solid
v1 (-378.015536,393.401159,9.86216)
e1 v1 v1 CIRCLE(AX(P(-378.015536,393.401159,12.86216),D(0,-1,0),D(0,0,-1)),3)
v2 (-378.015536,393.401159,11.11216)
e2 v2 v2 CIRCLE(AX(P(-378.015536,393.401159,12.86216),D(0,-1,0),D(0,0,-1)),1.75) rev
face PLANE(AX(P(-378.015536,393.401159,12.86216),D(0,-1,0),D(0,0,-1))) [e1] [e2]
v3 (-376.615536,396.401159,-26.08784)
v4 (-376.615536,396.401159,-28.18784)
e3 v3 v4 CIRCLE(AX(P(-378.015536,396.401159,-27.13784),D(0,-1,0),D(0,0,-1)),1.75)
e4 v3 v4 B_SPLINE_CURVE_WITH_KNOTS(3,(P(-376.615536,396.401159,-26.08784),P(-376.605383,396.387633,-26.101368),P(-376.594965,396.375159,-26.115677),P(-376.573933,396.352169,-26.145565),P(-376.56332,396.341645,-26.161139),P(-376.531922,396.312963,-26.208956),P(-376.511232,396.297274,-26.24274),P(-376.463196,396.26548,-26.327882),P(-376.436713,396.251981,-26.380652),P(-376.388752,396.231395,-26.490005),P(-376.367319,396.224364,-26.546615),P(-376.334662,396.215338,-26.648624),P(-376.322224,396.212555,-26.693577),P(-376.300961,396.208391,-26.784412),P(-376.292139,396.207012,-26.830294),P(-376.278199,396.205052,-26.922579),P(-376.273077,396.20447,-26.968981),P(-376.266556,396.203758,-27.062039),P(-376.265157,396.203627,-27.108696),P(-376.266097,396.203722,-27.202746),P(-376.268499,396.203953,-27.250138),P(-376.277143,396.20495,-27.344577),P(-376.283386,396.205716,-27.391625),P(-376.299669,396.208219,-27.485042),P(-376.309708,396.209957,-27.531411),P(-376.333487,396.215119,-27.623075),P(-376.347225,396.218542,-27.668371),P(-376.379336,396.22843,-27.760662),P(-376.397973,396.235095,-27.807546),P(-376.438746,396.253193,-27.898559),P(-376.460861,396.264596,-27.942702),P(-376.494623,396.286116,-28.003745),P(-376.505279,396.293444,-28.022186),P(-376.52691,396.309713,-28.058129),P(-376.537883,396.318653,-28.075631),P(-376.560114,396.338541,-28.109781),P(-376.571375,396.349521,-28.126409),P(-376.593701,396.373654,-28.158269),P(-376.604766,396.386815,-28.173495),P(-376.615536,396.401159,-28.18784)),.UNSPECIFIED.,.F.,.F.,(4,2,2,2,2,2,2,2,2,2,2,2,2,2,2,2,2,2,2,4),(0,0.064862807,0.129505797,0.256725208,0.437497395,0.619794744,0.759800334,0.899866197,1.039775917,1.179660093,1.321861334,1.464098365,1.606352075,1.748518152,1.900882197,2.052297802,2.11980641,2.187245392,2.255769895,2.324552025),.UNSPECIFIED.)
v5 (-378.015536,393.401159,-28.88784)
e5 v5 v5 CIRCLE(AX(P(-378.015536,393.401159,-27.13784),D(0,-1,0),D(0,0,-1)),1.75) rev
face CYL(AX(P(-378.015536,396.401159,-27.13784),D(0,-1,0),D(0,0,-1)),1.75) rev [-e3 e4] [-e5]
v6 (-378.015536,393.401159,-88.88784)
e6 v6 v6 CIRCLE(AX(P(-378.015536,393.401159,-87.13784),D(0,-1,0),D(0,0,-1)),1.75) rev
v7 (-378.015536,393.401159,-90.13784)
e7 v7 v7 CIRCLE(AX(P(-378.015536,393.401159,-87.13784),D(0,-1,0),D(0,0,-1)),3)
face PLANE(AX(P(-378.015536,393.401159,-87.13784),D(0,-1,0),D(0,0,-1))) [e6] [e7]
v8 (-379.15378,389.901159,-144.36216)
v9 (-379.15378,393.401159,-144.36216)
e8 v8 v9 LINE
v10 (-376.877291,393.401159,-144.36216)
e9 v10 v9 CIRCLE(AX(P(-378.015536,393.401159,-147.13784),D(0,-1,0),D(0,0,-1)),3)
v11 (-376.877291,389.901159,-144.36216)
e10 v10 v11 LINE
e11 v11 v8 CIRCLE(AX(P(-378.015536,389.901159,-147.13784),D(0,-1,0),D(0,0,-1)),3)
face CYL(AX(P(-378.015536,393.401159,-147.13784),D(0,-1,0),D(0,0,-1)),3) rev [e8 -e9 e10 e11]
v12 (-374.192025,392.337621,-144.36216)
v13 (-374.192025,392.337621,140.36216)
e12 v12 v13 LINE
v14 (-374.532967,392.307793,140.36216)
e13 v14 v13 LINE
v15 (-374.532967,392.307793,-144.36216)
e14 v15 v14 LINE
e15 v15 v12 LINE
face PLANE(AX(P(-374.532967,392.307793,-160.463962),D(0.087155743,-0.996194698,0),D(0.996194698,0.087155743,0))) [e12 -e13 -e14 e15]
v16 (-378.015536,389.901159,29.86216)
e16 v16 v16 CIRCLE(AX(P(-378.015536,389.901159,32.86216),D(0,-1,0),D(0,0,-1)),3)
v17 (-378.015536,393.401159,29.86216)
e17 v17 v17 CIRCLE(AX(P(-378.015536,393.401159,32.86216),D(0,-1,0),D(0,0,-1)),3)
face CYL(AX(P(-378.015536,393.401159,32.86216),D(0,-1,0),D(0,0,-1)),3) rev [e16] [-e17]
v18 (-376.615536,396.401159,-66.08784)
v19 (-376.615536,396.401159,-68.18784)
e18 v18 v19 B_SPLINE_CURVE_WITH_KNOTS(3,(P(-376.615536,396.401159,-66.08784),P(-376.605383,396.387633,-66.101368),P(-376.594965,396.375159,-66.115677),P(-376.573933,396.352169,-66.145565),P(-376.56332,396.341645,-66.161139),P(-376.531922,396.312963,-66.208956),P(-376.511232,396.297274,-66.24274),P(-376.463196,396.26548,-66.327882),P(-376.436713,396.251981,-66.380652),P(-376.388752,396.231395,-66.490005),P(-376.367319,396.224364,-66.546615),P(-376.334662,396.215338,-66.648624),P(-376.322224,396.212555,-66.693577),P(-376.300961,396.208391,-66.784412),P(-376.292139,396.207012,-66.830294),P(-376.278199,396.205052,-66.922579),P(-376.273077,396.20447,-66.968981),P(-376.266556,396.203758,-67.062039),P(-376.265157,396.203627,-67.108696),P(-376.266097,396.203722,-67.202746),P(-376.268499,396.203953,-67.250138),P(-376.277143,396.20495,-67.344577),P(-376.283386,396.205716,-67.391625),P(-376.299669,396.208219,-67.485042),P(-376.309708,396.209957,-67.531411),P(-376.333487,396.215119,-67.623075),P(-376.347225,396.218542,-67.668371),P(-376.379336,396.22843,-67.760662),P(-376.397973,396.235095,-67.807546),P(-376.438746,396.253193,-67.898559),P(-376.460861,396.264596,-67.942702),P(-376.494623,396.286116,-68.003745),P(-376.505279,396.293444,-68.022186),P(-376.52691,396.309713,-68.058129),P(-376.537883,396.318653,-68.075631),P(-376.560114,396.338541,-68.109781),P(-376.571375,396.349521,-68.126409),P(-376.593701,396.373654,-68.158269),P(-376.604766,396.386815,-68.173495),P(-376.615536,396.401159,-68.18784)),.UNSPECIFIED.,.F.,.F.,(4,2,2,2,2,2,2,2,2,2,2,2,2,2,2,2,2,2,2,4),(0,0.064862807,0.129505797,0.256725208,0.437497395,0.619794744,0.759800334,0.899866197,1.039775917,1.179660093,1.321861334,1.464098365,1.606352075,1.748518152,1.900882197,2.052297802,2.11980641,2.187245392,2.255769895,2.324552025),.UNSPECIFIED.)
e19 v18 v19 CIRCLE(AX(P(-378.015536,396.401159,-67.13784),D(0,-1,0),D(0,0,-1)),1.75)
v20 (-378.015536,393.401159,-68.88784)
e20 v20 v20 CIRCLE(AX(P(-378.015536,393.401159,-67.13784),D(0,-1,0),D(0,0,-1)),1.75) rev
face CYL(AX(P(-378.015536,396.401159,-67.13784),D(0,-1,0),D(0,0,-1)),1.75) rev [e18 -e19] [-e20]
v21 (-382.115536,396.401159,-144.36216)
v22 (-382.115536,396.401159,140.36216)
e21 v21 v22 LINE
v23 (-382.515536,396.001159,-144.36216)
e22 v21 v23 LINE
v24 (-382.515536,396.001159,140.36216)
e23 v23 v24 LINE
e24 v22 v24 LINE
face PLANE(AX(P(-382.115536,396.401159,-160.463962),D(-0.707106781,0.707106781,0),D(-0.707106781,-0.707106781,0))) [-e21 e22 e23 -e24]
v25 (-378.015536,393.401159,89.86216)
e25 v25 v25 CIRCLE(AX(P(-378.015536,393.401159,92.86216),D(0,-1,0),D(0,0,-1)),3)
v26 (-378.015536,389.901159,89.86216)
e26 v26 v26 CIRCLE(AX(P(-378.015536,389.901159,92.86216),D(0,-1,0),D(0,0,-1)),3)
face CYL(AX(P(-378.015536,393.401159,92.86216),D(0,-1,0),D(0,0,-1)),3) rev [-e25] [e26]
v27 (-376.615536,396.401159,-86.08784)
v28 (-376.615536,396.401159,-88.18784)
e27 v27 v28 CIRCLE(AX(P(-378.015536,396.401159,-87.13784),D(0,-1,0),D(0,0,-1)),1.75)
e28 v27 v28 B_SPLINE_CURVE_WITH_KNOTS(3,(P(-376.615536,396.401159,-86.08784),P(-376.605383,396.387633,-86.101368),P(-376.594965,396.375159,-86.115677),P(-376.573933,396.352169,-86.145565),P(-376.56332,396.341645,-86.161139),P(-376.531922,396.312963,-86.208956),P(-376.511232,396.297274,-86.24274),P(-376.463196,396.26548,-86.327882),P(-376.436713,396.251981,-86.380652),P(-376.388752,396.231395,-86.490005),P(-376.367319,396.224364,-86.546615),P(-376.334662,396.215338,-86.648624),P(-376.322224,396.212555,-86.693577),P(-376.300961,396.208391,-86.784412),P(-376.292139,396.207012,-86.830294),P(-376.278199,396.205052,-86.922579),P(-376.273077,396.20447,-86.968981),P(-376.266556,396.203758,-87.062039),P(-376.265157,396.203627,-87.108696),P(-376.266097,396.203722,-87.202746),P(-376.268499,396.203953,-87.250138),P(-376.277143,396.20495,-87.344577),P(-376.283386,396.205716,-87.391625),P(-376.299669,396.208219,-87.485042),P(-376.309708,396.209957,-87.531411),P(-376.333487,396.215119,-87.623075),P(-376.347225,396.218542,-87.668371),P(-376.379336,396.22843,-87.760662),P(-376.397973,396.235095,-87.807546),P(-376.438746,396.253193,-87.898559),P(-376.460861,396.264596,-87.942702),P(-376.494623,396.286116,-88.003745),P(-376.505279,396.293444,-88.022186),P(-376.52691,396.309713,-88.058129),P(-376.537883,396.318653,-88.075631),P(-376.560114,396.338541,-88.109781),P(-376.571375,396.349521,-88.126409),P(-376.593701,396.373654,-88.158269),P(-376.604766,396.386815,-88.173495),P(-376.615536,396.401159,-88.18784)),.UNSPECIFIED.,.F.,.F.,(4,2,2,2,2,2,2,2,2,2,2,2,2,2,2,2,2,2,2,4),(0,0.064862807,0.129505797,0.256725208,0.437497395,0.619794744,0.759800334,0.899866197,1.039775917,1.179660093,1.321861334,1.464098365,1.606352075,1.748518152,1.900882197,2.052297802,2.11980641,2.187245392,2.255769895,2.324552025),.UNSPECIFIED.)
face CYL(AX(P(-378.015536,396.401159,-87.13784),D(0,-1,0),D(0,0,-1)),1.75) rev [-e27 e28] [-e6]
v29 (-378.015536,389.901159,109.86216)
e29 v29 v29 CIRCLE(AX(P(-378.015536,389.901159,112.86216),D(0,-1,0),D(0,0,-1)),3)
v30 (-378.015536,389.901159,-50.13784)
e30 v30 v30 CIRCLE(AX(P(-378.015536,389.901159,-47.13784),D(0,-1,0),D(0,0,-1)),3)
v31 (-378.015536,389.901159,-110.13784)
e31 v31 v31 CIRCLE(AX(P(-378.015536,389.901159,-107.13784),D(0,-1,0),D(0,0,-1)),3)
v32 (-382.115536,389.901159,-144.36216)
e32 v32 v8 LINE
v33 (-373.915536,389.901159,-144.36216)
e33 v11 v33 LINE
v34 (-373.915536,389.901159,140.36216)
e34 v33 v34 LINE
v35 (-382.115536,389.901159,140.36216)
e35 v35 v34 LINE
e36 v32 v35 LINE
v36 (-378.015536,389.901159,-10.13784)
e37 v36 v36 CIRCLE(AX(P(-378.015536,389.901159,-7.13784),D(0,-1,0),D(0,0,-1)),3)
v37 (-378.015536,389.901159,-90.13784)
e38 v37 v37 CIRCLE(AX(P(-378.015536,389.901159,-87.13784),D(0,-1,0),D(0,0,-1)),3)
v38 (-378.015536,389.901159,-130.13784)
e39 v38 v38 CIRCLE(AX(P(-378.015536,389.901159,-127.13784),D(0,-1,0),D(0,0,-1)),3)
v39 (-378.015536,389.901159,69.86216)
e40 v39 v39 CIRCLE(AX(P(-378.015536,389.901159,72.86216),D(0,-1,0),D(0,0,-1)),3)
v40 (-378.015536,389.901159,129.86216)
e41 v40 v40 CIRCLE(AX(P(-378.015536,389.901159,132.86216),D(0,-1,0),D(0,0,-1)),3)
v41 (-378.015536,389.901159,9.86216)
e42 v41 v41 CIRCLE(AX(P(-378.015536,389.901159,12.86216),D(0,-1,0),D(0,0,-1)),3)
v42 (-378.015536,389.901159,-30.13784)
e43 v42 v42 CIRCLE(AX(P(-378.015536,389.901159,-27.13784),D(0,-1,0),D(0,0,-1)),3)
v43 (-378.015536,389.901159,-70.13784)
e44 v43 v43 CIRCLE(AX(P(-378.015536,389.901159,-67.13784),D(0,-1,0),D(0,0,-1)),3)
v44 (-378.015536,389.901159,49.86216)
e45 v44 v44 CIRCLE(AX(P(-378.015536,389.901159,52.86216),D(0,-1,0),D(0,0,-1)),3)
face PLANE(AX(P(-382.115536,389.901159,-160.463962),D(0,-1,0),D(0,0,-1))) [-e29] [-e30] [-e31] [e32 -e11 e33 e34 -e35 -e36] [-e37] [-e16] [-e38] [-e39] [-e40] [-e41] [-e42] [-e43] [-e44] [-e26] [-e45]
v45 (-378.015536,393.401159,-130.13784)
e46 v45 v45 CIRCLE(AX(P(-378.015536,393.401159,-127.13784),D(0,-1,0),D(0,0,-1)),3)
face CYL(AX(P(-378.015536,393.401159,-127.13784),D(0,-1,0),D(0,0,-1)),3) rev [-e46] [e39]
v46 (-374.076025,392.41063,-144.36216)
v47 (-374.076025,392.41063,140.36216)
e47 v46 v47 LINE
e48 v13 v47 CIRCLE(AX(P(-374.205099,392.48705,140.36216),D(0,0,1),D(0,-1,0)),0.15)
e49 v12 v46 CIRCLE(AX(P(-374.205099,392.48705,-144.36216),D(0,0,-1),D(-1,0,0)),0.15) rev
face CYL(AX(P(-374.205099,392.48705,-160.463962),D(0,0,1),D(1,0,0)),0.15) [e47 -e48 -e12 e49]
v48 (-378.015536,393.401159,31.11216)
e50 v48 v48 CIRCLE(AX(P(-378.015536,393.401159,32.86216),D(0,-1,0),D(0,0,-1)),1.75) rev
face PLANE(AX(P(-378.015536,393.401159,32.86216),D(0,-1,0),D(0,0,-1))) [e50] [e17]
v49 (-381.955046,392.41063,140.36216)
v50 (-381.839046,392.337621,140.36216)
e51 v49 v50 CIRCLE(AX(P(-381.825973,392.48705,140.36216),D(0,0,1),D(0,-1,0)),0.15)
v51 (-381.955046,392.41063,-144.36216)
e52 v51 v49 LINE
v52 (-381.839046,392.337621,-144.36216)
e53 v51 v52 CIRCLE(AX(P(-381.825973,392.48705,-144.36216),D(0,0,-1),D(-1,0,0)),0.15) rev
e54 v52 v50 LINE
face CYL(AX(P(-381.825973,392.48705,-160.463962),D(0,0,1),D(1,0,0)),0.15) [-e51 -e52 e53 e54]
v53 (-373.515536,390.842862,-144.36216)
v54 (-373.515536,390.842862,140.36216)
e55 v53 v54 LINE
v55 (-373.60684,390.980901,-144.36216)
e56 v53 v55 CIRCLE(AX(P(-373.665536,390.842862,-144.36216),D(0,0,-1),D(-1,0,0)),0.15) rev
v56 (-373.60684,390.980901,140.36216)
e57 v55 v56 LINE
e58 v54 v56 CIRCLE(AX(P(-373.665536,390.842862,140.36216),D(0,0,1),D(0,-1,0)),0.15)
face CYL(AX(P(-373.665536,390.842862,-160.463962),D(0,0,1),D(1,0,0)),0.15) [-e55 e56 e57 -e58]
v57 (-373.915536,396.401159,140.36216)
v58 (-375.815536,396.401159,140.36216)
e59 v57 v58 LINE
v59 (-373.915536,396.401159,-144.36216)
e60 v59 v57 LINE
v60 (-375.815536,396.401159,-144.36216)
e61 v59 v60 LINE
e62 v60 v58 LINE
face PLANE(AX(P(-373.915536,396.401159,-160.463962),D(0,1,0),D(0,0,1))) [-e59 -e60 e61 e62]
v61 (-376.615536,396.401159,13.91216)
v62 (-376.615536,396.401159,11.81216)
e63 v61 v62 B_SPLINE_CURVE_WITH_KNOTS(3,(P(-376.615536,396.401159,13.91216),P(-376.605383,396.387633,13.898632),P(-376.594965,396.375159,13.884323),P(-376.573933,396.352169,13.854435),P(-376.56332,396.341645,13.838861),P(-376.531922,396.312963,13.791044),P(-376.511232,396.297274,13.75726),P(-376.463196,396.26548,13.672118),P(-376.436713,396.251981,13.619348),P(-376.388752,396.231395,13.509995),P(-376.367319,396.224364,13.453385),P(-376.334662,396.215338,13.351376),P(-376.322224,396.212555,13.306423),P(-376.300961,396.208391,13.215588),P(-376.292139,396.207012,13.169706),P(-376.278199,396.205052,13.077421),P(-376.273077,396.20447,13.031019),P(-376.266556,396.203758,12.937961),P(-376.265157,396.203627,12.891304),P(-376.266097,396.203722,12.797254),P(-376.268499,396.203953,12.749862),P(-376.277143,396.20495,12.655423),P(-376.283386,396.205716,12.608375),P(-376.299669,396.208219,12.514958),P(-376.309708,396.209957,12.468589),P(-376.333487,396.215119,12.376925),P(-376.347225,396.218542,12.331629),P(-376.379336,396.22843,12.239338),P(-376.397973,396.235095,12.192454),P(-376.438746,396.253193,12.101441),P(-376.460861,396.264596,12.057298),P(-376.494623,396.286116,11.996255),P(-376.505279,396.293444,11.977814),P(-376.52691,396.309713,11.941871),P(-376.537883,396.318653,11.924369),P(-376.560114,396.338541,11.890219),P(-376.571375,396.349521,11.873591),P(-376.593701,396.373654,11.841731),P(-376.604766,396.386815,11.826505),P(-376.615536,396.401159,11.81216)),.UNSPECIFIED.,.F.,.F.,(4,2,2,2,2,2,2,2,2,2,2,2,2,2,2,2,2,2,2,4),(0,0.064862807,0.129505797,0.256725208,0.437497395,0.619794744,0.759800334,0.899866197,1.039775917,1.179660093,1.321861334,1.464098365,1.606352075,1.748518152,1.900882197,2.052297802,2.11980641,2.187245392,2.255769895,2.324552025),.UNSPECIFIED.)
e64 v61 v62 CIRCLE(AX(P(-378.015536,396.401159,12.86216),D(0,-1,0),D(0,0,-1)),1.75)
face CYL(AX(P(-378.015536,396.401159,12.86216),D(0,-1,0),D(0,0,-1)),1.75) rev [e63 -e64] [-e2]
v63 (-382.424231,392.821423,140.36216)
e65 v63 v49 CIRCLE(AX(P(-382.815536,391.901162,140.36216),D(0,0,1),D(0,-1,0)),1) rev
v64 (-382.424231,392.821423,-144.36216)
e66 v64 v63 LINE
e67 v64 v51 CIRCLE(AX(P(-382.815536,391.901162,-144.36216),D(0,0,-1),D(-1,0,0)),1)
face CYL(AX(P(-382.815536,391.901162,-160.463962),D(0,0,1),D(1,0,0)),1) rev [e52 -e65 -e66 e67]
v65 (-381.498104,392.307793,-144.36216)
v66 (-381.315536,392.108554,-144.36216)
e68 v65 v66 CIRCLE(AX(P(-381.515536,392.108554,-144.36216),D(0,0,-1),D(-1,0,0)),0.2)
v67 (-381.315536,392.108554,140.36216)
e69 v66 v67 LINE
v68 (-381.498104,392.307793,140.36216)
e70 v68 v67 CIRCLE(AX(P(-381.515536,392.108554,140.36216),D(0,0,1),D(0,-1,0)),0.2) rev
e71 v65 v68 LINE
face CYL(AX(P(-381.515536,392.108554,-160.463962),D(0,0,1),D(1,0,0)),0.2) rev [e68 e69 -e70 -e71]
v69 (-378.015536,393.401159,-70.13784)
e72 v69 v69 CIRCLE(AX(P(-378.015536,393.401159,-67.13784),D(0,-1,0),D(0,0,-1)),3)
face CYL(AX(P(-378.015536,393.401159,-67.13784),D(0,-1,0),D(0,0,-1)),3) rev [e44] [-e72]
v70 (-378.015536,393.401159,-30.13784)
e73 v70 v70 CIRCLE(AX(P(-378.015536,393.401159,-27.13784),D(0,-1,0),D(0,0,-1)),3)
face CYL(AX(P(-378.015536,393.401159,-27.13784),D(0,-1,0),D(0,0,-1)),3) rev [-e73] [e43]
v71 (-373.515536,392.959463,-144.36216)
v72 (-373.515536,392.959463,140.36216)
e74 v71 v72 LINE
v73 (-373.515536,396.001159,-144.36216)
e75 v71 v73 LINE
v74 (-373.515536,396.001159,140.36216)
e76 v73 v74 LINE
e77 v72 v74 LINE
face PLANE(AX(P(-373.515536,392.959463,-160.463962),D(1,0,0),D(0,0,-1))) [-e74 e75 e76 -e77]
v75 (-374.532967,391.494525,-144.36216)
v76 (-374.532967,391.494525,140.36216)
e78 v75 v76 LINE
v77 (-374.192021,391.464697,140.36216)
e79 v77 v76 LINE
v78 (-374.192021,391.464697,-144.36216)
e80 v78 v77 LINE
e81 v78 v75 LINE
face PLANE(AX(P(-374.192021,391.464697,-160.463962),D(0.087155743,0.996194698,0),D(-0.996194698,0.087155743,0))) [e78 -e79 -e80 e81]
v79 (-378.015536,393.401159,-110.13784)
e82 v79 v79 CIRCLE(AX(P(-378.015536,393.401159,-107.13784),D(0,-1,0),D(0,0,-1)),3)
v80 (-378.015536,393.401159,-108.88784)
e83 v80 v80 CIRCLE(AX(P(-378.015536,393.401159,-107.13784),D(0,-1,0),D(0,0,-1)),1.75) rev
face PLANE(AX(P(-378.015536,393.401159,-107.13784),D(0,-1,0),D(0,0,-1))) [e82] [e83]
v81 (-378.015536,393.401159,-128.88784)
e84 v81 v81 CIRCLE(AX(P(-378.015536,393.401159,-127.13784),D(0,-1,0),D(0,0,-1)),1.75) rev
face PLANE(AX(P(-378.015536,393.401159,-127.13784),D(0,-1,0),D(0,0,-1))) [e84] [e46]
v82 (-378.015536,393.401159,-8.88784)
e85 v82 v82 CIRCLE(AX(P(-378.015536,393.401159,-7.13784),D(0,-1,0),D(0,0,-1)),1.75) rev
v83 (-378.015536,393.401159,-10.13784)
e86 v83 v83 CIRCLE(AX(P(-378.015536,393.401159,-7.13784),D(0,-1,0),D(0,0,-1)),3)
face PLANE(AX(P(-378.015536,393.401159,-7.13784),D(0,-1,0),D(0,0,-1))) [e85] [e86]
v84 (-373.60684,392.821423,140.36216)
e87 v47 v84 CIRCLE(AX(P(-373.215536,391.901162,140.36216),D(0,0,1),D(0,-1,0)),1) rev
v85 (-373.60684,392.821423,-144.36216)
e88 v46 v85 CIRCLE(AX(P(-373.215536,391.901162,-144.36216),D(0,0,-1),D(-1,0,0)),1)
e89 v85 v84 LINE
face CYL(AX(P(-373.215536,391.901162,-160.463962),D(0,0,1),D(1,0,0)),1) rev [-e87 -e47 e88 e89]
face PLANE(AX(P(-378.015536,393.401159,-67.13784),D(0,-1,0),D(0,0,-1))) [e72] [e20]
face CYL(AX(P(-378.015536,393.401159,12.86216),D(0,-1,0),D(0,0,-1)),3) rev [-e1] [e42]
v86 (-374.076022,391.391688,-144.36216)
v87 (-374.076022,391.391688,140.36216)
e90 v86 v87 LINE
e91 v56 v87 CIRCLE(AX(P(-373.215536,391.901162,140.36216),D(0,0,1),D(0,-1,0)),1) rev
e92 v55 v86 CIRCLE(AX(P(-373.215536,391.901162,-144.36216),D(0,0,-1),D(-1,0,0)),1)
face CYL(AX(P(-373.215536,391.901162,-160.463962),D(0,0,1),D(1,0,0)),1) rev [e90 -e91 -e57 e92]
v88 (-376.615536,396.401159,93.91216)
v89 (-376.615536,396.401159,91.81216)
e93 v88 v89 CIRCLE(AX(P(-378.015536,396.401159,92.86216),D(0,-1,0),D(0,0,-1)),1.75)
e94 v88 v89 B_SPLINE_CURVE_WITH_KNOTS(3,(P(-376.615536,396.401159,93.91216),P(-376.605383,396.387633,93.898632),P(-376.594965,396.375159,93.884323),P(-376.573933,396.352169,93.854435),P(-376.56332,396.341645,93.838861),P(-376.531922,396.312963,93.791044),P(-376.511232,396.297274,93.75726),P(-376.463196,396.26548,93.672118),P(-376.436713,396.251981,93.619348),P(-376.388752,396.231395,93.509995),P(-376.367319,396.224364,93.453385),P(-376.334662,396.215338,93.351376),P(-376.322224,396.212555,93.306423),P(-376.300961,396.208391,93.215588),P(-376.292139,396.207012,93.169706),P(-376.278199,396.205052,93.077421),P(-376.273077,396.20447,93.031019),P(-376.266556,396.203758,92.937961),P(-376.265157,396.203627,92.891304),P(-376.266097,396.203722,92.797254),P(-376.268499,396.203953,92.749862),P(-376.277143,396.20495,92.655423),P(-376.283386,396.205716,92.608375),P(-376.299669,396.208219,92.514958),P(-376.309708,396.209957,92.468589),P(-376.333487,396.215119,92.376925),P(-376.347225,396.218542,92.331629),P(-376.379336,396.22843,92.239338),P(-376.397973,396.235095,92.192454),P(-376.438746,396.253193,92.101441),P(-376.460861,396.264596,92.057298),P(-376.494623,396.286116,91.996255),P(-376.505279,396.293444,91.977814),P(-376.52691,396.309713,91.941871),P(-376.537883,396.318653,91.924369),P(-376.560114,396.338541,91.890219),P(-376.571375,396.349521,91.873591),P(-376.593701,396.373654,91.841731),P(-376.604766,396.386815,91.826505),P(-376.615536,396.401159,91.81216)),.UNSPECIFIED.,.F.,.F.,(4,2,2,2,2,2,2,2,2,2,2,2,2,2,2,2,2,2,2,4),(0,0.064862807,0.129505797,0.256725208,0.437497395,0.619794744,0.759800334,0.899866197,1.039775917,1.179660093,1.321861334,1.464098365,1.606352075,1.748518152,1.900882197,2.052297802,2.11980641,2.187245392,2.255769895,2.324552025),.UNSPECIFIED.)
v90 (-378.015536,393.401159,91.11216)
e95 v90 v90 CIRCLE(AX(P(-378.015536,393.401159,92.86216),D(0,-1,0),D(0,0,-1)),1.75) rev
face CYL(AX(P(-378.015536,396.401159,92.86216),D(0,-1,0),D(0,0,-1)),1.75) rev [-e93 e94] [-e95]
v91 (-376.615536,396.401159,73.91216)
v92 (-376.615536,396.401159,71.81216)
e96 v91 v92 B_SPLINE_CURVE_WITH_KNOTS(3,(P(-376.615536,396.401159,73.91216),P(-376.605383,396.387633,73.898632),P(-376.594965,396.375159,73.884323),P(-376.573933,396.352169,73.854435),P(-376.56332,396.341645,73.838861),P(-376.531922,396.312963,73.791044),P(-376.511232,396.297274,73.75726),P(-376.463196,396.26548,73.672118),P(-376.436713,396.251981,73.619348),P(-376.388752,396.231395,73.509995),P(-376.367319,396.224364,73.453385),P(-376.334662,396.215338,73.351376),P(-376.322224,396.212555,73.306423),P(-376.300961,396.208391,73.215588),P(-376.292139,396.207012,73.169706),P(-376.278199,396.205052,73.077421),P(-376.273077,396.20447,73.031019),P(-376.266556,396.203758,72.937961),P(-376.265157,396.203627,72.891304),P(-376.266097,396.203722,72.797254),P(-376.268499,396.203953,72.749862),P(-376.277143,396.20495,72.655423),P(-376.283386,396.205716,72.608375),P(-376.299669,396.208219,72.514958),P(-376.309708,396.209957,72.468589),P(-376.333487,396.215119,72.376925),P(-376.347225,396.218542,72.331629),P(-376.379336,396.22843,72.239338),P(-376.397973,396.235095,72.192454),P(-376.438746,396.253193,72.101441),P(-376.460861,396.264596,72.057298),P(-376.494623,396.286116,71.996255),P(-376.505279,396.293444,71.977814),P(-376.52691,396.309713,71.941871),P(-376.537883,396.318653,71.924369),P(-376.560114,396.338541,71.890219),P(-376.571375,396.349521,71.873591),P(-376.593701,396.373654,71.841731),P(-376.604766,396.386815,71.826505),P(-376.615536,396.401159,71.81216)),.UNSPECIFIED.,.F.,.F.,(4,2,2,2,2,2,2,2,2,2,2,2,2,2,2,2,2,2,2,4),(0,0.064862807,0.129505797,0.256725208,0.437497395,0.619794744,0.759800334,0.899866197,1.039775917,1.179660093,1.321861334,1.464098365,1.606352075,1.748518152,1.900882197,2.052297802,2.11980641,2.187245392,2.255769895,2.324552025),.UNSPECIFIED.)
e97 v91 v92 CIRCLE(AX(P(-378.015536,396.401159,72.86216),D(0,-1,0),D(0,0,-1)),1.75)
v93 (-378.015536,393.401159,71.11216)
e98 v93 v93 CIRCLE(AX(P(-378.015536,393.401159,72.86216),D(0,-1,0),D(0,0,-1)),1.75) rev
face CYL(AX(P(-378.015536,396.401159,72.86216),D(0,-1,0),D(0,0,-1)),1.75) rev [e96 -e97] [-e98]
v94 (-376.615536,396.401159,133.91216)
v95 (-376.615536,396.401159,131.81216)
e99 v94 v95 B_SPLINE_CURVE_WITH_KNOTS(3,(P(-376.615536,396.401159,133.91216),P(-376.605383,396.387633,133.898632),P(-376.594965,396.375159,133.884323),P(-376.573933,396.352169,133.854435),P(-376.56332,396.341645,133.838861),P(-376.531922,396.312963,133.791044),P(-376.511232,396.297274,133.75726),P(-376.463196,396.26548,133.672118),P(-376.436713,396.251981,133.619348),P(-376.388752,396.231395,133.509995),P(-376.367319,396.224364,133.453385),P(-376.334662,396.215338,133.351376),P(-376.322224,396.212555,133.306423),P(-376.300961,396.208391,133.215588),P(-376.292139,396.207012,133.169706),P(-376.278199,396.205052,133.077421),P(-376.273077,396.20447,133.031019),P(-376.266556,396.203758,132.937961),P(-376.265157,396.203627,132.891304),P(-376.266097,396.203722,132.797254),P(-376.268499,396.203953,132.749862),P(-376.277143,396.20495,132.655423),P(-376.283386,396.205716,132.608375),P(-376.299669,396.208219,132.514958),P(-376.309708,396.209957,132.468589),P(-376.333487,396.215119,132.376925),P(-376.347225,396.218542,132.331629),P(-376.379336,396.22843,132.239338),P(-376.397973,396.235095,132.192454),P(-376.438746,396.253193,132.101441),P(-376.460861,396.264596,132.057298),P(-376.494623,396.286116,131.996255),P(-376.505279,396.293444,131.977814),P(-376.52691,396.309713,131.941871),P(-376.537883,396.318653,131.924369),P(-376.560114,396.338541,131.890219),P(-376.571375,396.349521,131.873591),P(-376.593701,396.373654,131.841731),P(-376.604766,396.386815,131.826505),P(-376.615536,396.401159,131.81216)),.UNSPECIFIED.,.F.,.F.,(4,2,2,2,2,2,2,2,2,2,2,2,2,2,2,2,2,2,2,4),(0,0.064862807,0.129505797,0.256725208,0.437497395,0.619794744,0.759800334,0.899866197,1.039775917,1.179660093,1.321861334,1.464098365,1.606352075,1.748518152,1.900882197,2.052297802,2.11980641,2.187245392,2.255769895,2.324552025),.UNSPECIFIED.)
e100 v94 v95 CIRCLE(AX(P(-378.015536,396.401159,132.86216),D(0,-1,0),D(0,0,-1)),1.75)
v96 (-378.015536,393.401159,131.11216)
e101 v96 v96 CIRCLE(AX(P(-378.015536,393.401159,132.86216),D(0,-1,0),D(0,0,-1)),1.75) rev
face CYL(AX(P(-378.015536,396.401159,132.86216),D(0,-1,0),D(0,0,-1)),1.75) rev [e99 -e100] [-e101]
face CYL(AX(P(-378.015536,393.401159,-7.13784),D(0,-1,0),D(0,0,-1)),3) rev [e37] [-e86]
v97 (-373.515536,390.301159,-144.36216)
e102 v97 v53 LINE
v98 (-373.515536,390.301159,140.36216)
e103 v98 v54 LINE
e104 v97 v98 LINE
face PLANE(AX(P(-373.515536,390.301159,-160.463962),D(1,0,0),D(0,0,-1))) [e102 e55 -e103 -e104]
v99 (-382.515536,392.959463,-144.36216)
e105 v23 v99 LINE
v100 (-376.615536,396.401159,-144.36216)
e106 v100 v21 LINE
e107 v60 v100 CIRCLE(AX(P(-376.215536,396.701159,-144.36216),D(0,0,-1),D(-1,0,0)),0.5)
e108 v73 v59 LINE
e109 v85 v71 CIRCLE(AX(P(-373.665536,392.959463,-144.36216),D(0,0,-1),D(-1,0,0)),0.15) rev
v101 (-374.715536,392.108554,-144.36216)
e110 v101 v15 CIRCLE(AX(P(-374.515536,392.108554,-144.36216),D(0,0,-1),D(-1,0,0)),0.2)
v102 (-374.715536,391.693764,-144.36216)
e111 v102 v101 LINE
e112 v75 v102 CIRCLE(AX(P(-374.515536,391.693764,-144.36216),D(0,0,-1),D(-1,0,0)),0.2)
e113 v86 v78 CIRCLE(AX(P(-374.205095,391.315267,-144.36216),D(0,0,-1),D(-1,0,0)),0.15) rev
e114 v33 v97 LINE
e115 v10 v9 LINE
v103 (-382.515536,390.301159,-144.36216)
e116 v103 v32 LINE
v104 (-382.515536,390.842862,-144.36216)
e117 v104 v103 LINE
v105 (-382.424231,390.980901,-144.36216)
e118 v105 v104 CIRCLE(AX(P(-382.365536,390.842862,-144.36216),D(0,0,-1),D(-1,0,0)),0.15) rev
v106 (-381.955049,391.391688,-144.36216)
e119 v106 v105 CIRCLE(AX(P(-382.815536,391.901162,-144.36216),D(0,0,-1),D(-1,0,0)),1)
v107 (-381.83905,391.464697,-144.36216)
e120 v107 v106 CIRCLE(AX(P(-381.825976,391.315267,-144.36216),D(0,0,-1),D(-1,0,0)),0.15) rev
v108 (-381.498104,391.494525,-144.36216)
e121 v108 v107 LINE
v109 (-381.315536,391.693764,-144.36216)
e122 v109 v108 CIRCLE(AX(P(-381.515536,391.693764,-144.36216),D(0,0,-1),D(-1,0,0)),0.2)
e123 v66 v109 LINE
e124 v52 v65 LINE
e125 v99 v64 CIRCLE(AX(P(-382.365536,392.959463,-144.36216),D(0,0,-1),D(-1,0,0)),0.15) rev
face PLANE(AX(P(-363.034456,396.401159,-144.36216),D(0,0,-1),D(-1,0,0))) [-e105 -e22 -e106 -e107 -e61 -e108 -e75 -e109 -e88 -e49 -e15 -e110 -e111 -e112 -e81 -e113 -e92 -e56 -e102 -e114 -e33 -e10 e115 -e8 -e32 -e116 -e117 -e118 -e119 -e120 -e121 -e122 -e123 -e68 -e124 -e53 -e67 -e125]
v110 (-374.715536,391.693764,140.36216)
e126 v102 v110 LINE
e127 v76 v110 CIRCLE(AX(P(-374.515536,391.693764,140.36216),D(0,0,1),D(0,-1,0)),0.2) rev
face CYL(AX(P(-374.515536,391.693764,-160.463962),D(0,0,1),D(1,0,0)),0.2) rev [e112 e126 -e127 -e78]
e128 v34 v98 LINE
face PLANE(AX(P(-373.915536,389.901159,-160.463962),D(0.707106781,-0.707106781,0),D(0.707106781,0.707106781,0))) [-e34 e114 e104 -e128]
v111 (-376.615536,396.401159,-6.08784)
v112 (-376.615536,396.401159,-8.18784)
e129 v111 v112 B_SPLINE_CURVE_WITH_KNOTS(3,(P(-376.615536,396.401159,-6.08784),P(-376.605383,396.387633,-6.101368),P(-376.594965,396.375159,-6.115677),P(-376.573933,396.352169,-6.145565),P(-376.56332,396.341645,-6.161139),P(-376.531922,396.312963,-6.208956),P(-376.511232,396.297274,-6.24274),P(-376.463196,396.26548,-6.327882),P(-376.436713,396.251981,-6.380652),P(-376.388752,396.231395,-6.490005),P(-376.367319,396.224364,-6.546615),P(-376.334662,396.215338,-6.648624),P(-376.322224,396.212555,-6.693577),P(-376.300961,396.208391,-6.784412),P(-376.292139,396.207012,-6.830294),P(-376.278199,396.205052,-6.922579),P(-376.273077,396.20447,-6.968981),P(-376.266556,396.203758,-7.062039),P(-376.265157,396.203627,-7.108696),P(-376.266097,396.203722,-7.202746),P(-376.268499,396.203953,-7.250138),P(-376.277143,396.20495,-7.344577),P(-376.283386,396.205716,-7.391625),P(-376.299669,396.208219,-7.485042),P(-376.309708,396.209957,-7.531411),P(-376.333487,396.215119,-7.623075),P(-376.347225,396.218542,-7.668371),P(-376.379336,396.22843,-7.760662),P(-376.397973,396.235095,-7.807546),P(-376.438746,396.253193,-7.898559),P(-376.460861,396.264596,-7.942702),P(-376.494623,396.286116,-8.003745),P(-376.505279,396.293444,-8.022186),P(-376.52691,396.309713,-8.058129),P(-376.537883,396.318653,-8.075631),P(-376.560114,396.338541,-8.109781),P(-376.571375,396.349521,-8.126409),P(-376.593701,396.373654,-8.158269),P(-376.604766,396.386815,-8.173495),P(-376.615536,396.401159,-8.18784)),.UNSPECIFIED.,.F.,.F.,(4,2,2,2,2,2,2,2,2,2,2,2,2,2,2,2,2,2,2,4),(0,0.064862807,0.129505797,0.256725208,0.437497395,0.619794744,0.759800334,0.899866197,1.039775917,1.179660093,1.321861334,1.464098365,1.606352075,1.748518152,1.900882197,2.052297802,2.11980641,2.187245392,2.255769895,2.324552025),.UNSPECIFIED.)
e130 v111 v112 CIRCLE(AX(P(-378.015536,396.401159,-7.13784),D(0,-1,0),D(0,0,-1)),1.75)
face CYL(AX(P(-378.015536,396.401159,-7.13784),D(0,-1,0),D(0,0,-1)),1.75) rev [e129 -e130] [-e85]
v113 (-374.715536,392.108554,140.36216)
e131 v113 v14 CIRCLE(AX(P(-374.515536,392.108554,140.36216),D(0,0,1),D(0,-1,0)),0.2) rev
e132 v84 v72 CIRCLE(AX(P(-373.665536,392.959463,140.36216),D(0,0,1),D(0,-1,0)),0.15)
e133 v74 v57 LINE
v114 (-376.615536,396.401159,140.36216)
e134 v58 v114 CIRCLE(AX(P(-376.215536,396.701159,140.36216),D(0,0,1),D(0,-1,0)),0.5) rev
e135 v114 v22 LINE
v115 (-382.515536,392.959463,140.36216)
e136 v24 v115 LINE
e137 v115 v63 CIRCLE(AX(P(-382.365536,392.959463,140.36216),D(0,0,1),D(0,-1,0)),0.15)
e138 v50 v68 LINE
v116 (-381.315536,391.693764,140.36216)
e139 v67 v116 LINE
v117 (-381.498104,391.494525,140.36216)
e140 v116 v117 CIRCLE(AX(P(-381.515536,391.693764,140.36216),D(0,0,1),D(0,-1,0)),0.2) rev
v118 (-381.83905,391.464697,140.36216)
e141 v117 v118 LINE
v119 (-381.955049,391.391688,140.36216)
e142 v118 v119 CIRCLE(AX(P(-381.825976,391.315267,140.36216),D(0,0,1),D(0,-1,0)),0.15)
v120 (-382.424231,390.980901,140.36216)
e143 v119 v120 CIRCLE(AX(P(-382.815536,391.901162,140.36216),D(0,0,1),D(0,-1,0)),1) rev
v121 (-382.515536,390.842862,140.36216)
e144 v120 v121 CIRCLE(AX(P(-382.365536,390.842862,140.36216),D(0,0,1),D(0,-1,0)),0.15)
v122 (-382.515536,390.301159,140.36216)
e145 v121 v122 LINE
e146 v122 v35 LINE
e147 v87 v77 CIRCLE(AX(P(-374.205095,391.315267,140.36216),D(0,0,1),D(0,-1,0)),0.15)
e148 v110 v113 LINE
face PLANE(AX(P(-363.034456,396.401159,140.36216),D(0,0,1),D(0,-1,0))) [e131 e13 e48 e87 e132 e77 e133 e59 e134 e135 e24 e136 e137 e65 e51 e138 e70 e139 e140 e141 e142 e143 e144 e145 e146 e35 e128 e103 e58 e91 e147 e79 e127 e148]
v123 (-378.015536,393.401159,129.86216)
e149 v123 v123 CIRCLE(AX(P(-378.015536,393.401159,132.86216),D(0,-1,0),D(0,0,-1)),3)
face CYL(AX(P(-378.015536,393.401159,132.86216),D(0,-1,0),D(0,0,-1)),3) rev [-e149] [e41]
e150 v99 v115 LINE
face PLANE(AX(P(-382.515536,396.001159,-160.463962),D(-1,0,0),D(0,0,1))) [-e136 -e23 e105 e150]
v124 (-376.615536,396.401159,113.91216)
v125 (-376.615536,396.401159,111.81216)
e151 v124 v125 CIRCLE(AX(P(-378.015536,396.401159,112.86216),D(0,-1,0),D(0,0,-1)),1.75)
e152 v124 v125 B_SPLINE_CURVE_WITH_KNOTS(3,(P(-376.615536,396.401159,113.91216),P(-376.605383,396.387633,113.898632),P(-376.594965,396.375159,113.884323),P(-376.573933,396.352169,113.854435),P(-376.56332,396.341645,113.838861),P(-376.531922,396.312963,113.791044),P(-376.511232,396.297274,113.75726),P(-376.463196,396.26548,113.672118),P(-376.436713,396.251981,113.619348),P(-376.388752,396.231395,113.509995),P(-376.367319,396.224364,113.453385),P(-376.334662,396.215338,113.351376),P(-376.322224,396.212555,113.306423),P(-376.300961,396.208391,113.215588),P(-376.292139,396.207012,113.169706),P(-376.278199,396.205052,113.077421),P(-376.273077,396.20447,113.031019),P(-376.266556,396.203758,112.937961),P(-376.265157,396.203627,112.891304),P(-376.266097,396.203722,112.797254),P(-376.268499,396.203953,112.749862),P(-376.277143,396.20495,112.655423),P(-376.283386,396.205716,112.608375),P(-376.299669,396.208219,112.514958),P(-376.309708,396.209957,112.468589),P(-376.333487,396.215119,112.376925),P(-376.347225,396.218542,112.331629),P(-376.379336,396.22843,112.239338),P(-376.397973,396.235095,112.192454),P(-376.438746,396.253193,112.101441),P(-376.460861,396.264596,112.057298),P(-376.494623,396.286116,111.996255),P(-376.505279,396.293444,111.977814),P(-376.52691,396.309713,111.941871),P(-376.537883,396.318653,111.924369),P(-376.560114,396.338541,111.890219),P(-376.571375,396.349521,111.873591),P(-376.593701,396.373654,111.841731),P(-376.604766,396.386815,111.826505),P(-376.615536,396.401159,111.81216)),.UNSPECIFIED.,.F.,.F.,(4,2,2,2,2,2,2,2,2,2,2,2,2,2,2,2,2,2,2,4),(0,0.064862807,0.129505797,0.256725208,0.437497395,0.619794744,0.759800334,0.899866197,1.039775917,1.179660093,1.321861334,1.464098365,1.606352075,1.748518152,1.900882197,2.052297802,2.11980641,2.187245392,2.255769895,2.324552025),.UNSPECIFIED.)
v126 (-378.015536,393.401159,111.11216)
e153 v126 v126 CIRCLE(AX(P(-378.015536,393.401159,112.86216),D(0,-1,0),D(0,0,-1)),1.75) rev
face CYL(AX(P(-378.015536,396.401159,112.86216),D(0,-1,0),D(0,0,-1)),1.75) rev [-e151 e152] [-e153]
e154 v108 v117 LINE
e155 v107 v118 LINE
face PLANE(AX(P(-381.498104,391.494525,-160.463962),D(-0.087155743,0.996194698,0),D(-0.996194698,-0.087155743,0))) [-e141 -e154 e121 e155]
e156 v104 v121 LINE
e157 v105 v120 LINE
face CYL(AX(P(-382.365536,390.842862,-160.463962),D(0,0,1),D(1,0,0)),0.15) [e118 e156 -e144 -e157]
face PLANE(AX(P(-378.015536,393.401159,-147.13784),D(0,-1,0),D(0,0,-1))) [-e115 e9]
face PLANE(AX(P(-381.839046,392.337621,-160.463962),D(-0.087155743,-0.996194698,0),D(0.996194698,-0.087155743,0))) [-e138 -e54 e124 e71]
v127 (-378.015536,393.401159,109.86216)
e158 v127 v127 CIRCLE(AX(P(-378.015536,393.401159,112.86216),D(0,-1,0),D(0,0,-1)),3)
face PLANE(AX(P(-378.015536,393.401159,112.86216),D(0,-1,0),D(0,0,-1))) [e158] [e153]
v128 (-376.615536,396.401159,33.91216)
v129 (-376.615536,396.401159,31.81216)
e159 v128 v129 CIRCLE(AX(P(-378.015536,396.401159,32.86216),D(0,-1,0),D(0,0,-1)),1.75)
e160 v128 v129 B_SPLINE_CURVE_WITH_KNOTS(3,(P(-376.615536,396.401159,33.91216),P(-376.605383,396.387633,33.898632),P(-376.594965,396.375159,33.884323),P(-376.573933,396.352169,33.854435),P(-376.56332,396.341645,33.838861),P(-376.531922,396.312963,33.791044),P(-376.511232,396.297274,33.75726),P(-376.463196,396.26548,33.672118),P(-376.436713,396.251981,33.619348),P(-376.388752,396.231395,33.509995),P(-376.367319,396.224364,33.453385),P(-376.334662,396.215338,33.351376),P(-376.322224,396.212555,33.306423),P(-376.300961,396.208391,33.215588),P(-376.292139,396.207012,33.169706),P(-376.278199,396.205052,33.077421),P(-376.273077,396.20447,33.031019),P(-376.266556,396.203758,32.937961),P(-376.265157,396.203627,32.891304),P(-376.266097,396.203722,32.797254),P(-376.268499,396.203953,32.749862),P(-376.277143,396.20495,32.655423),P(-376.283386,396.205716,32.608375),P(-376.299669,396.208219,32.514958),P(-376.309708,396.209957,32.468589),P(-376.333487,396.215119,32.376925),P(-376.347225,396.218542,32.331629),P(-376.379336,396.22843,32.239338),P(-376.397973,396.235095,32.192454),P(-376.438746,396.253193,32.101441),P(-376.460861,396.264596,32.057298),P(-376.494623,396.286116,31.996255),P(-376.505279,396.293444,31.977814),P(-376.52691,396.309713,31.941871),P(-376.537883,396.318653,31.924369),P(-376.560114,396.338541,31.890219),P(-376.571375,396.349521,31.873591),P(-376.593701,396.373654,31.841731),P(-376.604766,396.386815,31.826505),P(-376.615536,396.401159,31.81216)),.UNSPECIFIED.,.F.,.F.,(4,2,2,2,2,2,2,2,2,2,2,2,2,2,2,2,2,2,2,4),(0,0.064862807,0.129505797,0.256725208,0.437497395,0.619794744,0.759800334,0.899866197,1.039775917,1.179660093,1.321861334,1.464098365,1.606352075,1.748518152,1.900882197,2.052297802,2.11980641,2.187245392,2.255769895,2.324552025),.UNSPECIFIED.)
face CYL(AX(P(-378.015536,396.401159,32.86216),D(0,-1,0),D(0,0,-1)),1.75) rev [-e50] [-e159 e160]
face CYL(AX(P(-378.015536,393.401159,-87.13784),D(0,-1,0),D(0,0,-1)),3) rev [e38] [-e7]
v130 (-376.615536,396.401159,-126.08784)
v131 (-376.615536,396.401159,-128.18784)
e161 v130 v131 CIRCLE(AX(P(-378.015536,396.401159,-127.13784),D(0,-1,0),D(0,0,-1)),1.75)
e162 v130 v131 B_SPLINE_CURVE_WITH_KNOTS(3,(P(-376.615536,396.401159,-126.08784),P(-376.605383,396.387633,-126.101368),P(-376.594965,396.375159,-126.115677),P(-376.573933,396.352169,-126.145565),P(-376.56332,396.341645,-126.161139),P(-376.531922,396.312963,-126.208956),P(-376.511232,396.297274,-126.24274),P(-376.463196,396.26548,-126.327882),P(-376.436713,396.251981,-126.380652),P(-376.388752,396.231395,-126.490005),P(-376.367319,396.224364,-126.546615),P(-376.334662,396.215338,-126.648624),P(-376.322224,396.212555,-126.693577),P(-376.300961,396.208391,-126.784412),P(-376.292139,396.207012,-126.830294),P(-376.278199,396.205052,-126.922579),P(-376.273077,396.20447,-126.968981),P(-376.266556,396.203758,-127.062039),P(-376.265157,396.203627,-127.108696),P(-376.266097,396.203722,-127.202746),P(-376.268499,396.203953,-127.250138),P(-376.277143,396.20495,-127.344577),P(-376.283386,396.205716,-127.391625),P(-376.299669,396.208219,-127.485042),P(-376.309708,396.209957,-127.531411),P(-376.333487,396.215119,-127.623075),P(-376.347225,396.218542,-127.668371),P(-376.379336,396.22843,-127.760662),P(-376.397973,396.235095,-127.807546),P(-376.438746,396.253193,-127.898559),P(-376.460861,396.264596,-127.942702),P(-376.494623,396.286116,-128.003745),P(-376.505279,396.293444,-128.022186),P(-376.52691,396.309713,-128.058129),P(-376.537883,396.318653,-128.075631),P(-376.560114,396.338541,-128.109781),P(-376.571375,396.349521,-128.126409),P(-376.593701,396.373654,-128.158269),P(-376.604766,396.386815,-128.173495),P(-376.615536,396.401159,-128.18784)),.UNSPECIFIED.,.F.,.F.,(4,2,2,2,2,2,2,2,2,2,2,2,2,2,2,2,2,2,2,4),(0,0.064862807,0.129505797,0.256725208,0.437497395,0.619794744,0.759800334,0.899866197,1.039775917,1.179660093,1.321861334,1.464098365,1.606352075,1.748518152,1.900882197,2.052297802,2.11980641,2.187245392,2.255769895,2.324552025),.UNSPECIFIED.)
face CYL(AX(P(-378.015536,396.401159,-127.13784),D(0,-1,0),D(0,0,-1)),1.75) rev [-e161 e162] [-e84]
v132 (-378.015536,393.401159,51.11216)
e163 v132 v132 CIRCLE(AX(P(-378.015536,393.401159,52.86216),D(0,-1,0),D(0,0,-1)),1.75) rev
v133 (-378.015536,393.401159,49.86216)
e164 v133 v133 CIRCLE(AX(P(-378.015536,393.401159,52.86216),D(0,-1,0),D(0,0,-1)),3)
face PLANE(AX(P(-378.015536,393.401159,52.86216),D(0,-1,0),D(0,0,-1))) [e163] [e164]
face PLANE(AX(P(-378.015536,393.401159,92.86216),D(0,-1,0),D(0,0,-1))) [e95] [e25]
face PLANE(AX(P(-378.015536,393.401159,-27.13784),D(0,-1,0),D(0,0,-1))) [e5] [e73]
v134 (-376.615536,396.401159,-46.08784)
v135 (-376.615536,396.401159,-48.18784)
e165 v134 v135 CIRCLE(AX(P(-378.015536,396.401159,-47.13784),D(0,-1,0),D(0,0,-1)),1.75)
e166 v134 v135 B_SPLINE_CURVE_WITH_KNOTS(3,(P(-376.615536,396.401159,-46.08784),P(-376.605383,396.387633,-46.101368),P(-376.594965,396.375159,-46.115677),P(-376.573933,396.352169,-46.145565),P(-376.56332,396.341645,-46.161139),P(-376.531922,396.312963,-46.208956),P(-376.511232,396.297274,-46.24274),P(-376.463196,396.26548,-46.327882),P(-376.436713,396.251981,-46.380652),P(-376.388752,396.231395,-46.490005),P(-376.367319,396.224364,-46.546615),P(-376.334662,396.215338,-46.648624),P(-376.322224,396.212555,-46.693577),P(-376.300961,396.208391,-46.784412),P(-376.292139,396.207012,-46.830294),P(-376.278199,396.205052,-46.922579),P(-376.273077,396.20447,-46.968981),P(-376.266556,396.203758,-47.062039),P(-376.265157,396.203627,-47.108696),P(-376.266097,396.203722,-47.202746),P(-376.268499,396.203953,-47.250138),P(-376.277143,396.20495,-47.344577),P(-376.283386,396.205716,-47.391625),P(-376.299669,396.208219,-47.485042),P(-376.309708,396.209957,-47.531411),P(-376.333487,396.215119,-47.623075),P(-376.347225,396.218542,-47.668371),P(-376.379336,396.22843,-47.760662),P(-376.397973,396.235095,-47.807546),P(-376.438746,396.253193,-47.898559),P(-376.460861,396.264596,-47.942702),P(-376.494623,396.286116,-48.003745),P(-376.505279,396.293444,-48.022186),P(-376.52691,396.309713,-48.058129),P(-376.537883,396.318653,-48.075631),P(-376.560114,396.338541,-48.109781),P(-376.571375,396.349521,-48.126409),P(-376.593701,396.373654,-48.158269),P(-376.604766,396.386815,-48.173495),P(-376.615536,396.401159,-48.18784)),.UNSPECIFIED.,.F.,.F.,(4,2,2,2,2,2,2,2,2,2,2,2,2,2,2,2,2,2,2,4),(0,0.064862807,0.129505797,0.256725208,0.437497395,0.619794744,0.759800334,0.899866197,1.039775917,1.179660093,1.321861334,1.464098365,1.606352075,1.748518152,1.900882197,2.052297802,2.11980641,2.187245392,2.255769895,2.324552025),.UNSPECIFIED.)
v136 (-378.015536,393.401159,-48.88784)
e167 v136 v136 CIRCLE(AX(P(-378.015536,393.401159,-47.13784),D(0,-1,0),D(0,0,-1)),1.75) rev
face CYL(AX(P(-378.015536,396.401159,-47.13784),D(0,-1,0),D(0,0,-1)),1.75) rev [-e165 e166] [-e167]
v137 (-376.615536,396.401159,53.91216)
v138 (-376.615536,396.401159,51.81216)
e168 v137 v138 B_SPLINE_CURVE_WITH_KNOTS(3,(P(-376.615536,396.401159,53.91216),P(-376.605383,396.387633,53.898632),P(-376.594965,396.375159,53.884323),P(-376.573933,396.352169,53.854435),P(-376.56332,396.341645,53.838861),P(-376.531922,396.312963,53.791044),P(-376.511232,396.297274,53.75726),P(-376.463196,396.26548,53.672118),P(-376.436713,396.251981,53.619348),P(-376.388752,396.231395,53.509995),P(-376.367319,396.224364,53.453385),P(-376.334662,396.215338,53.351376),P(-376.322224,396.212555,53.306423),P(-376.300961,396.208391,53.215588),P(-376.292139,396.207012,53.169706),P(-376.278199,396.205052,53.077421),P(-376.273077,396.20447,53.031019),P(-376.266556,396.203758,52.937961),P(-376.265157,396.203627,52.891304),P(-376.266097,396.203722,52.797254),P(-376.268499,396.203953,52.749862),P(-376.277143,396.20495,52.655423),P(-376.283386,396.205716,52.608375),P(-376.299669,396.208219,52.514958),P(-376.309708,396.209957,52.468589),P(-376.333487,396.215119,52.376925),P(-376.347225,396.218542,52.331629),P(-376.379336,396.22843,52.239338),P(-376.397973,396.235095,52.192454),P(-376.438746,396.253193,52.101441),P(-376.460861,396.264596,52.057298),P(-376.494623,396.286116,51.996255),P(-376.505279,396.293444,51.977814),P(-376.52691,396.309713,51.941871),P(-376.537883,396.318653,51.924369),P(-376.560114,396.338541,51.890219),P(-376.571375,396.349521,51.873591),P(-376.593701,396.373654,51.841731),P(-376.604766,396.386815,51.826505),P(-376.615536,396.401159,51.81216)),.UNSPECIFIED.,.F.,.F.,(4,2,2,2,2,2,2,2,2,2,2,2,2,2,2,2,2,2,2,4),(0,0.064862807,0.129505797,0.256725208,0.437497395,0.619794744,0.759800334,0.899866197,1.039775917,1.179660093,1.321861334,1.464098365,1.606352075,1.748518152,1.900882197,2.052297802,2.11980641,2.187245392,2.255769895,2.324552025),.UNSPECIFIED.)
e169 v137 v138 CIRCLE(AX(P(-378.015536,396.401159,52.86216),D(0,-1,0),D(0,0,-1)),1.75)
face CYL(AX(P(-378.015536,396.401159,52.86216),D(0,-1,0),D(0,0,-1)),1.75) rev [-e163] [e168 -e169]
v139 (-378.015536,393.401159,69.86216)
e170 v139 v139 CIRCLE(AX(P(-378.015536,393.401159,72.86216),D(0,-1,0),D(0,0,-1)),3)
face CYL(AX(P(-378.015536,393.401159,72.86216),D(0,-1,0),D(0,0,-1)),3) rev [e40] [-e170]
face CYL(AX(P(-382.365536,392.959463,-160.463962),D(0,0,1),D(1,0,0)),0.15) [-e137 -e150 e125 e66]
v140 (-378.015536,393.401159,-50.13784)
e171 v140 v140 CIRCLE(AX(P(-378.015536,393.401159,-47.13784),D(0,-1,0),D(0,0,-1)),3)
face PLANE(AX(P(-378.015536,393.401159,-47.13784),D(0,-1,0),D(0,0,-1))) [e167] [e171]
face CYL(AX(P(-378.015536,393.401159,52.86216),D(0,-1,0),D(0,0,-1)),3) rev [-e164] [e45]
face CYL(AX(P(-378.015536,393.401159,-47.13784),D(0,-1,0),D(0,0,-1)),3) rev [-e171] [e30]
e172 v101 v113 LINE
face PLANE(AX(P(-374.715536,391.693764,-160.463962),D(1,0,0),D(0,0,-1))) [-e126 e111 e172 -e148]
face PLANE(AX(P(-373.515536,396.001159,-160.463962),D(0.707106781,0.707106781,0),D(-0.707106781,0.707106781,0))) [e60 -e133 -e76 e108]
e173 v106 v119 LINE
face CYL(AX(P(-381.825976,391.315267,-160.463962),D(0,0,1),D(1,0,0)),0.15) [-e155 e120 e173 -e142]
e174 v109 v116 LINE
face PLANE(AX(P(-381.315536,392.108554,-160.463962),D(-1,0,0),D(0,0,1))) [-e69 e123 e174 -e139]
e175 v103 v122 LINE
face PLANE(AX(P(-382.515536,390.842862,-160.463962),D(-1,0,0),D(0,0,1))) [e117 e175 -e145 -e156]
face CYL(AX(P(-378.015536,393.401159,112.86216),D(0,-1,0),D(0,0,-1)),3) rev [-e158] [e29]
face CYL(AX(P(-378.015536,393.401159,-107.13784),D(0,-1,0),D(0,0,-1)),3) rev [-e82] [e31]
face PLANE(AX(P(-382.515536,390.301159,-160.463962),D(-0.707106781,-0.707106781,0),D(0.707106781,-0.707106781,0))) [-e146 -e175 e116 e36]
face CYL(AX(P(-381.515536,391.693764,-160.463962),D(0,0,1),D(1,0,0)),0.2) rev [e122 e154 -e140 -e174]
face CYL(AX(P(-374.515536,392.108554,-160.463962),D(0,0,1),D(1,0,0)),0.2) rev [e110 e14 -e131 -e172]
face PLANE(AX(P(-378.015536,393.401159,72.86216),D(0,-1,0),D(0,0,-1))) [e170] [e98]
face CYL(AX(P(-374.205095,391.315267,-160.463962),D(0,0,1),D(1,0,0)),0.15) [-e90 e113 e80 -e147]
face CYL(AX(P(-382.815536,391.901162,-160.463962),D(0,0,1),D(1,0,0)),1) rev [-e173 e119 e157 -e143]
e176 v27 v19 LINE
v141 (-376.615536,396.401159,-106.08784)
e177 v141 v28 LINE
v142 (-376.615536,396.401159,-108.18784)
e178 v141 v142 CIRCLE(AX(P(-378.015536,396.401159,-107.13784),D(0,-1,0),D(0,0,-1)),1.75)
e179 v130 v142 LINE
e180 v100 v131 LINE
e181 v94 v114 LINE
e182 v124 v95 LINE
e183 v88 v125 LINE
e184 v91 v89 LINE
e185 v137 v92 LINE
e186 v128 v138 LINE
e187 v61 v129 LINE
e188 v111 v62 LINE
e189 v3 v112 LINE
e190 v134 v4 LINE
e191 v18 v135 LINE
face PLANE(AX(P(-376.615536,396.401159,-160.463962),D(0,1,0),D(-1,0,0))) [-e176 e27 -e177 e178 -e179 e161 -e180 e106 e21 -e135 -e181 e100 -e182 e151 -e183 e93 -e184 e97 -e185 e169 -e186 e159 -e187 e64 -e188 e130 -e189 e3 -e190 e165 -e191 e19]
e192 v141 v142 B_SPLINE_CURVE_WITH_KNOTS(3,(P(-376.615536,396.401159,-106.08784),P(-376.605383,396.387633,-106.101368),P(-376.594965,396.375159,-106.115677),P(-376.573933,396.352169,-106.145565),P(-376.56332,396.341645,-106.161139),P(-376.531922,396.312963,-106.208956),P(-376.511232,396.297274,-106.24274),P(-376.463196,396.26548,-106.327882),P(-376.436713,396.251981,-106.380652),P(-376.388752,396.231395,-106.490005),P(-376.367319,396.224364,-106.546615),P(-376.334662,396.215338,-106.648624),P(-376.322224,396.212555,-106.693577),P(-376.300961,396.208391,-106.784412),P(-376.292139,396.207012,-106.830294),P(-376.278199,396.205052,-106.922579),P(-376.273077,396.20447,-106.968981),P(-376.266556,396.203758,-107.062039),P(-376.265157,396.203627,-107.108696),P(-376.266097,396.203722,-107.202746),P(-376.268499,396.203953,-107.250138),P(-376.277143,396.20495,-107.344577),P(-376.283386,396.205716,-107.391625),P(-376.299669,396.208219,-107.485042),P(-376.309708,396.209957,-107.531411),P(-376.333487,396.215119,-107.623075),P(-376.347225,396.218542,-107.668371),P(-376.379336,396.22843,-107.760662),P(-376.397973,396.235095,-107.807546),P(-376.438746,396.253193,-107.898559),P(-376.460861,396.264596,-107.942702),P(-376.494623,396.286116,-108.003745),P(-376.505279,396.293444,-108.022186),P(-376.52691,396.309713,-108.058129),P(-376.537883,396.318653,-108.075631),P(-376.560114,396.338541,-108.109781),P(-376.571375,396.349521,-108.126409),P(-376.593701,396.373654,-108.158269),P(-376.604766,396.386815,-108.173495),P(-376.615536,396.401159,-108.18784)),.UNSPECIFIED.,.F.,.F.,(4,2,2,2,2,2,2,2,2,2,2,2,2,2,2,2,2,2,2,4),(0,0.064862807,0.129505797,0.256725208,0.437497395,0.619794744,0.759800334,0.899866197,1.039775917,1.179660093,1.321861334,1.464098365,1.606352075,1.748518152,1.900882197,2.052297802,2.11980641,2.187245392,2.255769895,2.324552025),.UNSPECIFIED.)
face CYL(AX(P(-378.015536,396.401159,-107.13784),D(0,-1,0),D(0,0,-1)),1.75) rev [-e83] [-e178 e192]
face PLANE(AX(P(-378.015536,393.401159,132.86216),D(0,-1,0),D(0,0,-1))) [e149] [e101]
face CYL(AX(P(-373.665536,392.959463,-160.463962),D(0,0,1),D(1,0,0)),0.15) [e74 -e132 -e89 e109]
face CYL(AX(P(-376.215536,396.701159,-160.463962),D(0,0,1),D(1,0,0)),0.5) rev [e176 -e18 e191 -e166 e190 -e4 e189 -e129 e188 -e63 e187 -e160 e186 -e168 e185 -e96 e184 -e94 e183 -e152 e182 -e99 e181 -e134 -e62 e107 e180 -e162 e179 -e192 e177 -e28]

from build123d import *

# Parameters (mm, degrees)
BOSS_EXTRUDE1_START = -144.36216
BOSS_EXTRUDE1_DEPTH = 284.72432
SKETCH2_R           = 1.75
CUT_EXTRUDE1_DEPTH  = 409.901966471
SKETCH2_3_R         = 3
CUT_EXTRUDE2_DEPTH  = 3.5


# Read off the part's stored shape, not the designer's step: Boss-Extrude1
with BuildPart() as part:
    # Boss-Extrude1 outline → Boss-Extrude1 (new body)
    with BuildSketch(Plane.XY.offset(BOSS_EXTRUDE1_START)):
        with BuildLine():
            ThreePointArc((-375.815535559, 396.401159064), (-376.215535559, 396.201159064), (-376.615535559, 396.401159064))
            Line((-376.615535559, 396.401159064), (-382.115535559, 396.401159064))
            Line((-382.115535559, 396.401159064), (-382.515535559, 396.001159064))
            Line((-382.515535559, 396.001159064), (-382.515535559, 392.959462588))
            ThreePointArc((-382.515535559, 392.959462588), (-382.490644208, 392.876710995), (-382.424231211, 392.82142339))
            ThreePointArc((-382.424231211, 392.82142339), (-382.156798336, 392.653535157), (-381.955046042, 392.410630209))
            ThreePointArc((-381.955046042, 392.410630209), (-381.905872585, 392.360101643), (-381.839045976, 392.337621226))
            Line((-381.839045976, 392.337621226), (-381.498104411, 392.307792704))
            ThreePointArc((-381.498104411, 392.307792704), (-381.368080092, 392.243671806), (-381.315535559, 392.108553765))
            Line((-381.315535559, 392.108553765), (-381.315535559, 391.693764363))
            ThreePointArc((-381.315535559, 391.693764363), (-381.368080092, 391.558646322), (-381.498104411, 391.494525424))
            Line((-381.498104411, 391.494525424), (-381.839049723, 391.464696574))
            ThreePointArc((-381.839049723, 391.464696574), (-381.905875926, 391.442216412), (-381.9550493, 391.391688416))
            ThreePointArc((-381.9550493, 391.391688416), (-382.156800742, 391.148786865), (-382.424231211, 390.980900738))
            ThreePointArc((-382.424231211, 390.980900738), (-382.490644208, 390.925613133), (-382.515535559, 390.84286154))
            Line((-382.515535559, 390.84286154), (-382.515535559, 390.301159064))
            Line((-382.515535559, 390.301159064), (-382.115535559, 389.901159064))
            Line((-382.115535559, 389.901159064), (-373.915535559, 389.901159064))
            Line((-373.915535559, 389.901159064), (-373.515535559, 390.301159064))
            Line((-373.515535559, 390.301159064), (-373.515535559, 390.84286154))
            ThreePointArc((-373.515535559, 390.84286154), (-373.540426911, 390.925613132), (-373.606839907, 390.980900738))
            ThreePointArc((-373.606839907, 390.980900738), (-373.874270377, 391.148786865), (-374.076021819, 391.391688416))
            ThreePointArc((-374.076021819, 391.391688416), (-374.125195193, 391.442216412), (-374.192021396, 391.464696574))
            Line((-374.192021396, 391.464696574), (-374.532966708, 391.494525424))
            ThreePointArc((-374.532966708, 391.494525424), (-374.662991027, 391.558646322), (-374.715535559, 391.693764363))
            Line((-374.715535559, 391.693764363), (-374.715535559, 392.108553765))
            ThreePointArc((-374.715535559, 392.108553765), (-374.662991027, 392.243671806), (-374.532966708, 392.307792704))
            Line((-374.532966708, 392.307792704), (-374.192025143, 392.337621226))
            ThreePointArc((-374.192025143, 392.337621226), (-374.125198533, 392.360101643), (-374.076025076, 392.410630209))
            ThreePointArc((-374.076025076, 392.410630209), (-373.874272783, 392.653535157), (-373.606839907, 392.82142339))
            ThreePointArc((-373.606839907, 392.82142339), (-373.540426911, 392.876710996), (-373.515535559, 392.959462588))
            Line((-373.515535559, 392.959462588), (-373.515535559, 396.001159064))
            Line((-373.515535559, 396.001159064), (-373.915535559, 396.401159064))
            Line((-373.915535559, 396.401159064), (-375.815535559, 396.401159064))
        make_face()
    extrude(amount=BOSS_EXTRUDE1_DEPTH)

    # Sketch2 → Cut-Extrude1 (cut, through all)
    with BuildSketch(Plane.XZ.offset(-389.901159064)):
        with Locations(Location((-378.015535559, 132.86216, 0), (0, 0, 270))):
            Circle(SKETCH2_R)
        with Locations(Location((-378.015535559, 112.86216, 0), (0, 0, 270))):
            Circle(SKETCH2_R)
        with Locations(Location((-378.015535559, 92.86216, 0), (0, 0, 270))):
            Circle(SKETCH2_R)
        with Locations(Location((-378.015535559, 72.86216, 0), (0, 0, 270))):
            Circle(SKETCH2_R)
        with Locations(Location((-378.015535559, 52.86216, 0), (0, 0, 270))):
            Circle(SKETCH2_R)
        with Locations(Location((-378.015535559, 32.86216, 0), (0, 0, 270))):
            Circle(SKETCH2_R)
        with Locations(Location((-378.015535559, 12.86216, 0), (0, 0, 270))):
            Circle(SKETCH2_R)
        with Locations(Location((-378.015535559, -7.13784, 0), (0, 0, 270))):
            Circle(SKETCH2_R)
        with Locations(Location((-378.015535559, -27.13784, 0), (0, 0, 270))):
            Circle(SKETCH2_R)
        with Locations(Location((-378.015535559, -47.13784, 0), (0, 0, 270))):
            Circle(SKETCH2_R)
        with Locations(Location((-378.015535559, -67.13784, 0), (0, 0, 270))):
            Circle(SKETCH2_R)
        with Locations(Location((-378.015535559, -87.13784, 0), (0, 0, 270))):
            Circle(SKETCH2_R)
        with Locations(Location((-378.015535559, -107.13784, 0), (0, 0, 270))):
            Circle(SKETCH2_R)
        with Locations(Location((-378.015535559, -127.13784, 0), (0, 0, 270))):
            Circle(SKETCH2_R)
        with Locations((-378.015535559, -147.13784)):
            Circle(SKETCH2_R)
        with Locations((-378.015535559, -167.13784)):
            Circle(SKETCH2_R)
        with Locations((-378.015535559, -187.13784)):
            Circle(SKETCH2_R)
        with Locations((-378.015535559, -207.13784)):
            Circle(SKETCH2_R)
        with Locations((-378.015535559, -227.13784)):
            Circle(SKETCH2_R)
        with Locations((-378.015535559, -247.13784)):
            Circle(SKETCH2_R)
        with Locations((-378.015535559, -267.13784)):
            Circle(SKETCH2_R)
        with Locations((-378.015535559, -287.13784)):
            Circle(SKETCH2_R)
        with Locations((-378.015535559, -307.13784)):
            Circle(SKETCH2_R)
    extrude(amount=-CUT_EXTRUDE1_DEPTH, mode=Mode.SUBTRACT)

    # Sketch2<3> → Cut-Extrude2 (cut)
    with BuildSketch(Plane.XZ.offset(-389.901159064)):
        with Locations(Location((-378.015535559, 132.86216, 0), (0, 0, 270))):
            Circle(SKETCH2_3_R)
        with Locations(Location((-378.015535559, 112.86216, 0), (0, 0, 270))):
            Circle(SKETCH2_3_R)
        with Locations(Location((-378.015535559, 92.86216, 0), (0, 0, 270))):
            Circle(SKETCH2_3_R)
        with Locations(Location((-378.015535559, 72.86216, 0), (0, 0, 270))):
            Circle(SKETCH2_3_R)
        with Locations(Location((-378.015535559, 52.86216, 0), (0, 0, 270))):
            Circle(SKETCH2_3_R)
        with Locations(Location((-378.015535559, 32.86216, 0), (0, 0, 270))):
            Circle(SKETCH2_3_R)
        with Locations(Location((-378.015535559, 12.86216, 0), (0, 0, 270))):
            Circle(SKETCH2_3_R)
        with Locations(Location((-378.015535559, -7.13784, 0), (0, 0, 270))):
            Circle(SKETCH2_3_R)
        with Locations(Location((-378.015535559, -27.13784, 0), (0, 0, 270))):
            Circle(SKETCH2_3_R)
        with Locations(Location((-378.015535559, -47.13784, 0), (0, 0, 270))):
            Circle(SKETCH2_3_R)
        with Locations(Location((-378.015535559, -67.13784, 0), (0, 0, 270))):
            Circle(SKETCH2_3_R)
        with Locations(Location((-378.015535559, -87.13784, 0), (0, 0, 270))):
            Circle(SKETCH2_3_R)
        with Locations(Location((-378.015535559, -107.13784, 0), (0, 0, 270))):
            Circle(SKETCH2_3_R)
        with Locations(Location((-378.015535559, -127.13784, 0), (0, 0, 270))):
            Circle(SKETCH2_3_R)
        with Locations((-378.015535559, -147.13784)):
            Circle(SKETCH2_3_R)
        with Locations((-378.015535559, -167.13784)):
            Circle(SKETCH2_3_R)
    extrude(amount=-CUT_EXTRUDE2_DEPTH, mode=Mode.SUBTRACT)


solid = part.part
